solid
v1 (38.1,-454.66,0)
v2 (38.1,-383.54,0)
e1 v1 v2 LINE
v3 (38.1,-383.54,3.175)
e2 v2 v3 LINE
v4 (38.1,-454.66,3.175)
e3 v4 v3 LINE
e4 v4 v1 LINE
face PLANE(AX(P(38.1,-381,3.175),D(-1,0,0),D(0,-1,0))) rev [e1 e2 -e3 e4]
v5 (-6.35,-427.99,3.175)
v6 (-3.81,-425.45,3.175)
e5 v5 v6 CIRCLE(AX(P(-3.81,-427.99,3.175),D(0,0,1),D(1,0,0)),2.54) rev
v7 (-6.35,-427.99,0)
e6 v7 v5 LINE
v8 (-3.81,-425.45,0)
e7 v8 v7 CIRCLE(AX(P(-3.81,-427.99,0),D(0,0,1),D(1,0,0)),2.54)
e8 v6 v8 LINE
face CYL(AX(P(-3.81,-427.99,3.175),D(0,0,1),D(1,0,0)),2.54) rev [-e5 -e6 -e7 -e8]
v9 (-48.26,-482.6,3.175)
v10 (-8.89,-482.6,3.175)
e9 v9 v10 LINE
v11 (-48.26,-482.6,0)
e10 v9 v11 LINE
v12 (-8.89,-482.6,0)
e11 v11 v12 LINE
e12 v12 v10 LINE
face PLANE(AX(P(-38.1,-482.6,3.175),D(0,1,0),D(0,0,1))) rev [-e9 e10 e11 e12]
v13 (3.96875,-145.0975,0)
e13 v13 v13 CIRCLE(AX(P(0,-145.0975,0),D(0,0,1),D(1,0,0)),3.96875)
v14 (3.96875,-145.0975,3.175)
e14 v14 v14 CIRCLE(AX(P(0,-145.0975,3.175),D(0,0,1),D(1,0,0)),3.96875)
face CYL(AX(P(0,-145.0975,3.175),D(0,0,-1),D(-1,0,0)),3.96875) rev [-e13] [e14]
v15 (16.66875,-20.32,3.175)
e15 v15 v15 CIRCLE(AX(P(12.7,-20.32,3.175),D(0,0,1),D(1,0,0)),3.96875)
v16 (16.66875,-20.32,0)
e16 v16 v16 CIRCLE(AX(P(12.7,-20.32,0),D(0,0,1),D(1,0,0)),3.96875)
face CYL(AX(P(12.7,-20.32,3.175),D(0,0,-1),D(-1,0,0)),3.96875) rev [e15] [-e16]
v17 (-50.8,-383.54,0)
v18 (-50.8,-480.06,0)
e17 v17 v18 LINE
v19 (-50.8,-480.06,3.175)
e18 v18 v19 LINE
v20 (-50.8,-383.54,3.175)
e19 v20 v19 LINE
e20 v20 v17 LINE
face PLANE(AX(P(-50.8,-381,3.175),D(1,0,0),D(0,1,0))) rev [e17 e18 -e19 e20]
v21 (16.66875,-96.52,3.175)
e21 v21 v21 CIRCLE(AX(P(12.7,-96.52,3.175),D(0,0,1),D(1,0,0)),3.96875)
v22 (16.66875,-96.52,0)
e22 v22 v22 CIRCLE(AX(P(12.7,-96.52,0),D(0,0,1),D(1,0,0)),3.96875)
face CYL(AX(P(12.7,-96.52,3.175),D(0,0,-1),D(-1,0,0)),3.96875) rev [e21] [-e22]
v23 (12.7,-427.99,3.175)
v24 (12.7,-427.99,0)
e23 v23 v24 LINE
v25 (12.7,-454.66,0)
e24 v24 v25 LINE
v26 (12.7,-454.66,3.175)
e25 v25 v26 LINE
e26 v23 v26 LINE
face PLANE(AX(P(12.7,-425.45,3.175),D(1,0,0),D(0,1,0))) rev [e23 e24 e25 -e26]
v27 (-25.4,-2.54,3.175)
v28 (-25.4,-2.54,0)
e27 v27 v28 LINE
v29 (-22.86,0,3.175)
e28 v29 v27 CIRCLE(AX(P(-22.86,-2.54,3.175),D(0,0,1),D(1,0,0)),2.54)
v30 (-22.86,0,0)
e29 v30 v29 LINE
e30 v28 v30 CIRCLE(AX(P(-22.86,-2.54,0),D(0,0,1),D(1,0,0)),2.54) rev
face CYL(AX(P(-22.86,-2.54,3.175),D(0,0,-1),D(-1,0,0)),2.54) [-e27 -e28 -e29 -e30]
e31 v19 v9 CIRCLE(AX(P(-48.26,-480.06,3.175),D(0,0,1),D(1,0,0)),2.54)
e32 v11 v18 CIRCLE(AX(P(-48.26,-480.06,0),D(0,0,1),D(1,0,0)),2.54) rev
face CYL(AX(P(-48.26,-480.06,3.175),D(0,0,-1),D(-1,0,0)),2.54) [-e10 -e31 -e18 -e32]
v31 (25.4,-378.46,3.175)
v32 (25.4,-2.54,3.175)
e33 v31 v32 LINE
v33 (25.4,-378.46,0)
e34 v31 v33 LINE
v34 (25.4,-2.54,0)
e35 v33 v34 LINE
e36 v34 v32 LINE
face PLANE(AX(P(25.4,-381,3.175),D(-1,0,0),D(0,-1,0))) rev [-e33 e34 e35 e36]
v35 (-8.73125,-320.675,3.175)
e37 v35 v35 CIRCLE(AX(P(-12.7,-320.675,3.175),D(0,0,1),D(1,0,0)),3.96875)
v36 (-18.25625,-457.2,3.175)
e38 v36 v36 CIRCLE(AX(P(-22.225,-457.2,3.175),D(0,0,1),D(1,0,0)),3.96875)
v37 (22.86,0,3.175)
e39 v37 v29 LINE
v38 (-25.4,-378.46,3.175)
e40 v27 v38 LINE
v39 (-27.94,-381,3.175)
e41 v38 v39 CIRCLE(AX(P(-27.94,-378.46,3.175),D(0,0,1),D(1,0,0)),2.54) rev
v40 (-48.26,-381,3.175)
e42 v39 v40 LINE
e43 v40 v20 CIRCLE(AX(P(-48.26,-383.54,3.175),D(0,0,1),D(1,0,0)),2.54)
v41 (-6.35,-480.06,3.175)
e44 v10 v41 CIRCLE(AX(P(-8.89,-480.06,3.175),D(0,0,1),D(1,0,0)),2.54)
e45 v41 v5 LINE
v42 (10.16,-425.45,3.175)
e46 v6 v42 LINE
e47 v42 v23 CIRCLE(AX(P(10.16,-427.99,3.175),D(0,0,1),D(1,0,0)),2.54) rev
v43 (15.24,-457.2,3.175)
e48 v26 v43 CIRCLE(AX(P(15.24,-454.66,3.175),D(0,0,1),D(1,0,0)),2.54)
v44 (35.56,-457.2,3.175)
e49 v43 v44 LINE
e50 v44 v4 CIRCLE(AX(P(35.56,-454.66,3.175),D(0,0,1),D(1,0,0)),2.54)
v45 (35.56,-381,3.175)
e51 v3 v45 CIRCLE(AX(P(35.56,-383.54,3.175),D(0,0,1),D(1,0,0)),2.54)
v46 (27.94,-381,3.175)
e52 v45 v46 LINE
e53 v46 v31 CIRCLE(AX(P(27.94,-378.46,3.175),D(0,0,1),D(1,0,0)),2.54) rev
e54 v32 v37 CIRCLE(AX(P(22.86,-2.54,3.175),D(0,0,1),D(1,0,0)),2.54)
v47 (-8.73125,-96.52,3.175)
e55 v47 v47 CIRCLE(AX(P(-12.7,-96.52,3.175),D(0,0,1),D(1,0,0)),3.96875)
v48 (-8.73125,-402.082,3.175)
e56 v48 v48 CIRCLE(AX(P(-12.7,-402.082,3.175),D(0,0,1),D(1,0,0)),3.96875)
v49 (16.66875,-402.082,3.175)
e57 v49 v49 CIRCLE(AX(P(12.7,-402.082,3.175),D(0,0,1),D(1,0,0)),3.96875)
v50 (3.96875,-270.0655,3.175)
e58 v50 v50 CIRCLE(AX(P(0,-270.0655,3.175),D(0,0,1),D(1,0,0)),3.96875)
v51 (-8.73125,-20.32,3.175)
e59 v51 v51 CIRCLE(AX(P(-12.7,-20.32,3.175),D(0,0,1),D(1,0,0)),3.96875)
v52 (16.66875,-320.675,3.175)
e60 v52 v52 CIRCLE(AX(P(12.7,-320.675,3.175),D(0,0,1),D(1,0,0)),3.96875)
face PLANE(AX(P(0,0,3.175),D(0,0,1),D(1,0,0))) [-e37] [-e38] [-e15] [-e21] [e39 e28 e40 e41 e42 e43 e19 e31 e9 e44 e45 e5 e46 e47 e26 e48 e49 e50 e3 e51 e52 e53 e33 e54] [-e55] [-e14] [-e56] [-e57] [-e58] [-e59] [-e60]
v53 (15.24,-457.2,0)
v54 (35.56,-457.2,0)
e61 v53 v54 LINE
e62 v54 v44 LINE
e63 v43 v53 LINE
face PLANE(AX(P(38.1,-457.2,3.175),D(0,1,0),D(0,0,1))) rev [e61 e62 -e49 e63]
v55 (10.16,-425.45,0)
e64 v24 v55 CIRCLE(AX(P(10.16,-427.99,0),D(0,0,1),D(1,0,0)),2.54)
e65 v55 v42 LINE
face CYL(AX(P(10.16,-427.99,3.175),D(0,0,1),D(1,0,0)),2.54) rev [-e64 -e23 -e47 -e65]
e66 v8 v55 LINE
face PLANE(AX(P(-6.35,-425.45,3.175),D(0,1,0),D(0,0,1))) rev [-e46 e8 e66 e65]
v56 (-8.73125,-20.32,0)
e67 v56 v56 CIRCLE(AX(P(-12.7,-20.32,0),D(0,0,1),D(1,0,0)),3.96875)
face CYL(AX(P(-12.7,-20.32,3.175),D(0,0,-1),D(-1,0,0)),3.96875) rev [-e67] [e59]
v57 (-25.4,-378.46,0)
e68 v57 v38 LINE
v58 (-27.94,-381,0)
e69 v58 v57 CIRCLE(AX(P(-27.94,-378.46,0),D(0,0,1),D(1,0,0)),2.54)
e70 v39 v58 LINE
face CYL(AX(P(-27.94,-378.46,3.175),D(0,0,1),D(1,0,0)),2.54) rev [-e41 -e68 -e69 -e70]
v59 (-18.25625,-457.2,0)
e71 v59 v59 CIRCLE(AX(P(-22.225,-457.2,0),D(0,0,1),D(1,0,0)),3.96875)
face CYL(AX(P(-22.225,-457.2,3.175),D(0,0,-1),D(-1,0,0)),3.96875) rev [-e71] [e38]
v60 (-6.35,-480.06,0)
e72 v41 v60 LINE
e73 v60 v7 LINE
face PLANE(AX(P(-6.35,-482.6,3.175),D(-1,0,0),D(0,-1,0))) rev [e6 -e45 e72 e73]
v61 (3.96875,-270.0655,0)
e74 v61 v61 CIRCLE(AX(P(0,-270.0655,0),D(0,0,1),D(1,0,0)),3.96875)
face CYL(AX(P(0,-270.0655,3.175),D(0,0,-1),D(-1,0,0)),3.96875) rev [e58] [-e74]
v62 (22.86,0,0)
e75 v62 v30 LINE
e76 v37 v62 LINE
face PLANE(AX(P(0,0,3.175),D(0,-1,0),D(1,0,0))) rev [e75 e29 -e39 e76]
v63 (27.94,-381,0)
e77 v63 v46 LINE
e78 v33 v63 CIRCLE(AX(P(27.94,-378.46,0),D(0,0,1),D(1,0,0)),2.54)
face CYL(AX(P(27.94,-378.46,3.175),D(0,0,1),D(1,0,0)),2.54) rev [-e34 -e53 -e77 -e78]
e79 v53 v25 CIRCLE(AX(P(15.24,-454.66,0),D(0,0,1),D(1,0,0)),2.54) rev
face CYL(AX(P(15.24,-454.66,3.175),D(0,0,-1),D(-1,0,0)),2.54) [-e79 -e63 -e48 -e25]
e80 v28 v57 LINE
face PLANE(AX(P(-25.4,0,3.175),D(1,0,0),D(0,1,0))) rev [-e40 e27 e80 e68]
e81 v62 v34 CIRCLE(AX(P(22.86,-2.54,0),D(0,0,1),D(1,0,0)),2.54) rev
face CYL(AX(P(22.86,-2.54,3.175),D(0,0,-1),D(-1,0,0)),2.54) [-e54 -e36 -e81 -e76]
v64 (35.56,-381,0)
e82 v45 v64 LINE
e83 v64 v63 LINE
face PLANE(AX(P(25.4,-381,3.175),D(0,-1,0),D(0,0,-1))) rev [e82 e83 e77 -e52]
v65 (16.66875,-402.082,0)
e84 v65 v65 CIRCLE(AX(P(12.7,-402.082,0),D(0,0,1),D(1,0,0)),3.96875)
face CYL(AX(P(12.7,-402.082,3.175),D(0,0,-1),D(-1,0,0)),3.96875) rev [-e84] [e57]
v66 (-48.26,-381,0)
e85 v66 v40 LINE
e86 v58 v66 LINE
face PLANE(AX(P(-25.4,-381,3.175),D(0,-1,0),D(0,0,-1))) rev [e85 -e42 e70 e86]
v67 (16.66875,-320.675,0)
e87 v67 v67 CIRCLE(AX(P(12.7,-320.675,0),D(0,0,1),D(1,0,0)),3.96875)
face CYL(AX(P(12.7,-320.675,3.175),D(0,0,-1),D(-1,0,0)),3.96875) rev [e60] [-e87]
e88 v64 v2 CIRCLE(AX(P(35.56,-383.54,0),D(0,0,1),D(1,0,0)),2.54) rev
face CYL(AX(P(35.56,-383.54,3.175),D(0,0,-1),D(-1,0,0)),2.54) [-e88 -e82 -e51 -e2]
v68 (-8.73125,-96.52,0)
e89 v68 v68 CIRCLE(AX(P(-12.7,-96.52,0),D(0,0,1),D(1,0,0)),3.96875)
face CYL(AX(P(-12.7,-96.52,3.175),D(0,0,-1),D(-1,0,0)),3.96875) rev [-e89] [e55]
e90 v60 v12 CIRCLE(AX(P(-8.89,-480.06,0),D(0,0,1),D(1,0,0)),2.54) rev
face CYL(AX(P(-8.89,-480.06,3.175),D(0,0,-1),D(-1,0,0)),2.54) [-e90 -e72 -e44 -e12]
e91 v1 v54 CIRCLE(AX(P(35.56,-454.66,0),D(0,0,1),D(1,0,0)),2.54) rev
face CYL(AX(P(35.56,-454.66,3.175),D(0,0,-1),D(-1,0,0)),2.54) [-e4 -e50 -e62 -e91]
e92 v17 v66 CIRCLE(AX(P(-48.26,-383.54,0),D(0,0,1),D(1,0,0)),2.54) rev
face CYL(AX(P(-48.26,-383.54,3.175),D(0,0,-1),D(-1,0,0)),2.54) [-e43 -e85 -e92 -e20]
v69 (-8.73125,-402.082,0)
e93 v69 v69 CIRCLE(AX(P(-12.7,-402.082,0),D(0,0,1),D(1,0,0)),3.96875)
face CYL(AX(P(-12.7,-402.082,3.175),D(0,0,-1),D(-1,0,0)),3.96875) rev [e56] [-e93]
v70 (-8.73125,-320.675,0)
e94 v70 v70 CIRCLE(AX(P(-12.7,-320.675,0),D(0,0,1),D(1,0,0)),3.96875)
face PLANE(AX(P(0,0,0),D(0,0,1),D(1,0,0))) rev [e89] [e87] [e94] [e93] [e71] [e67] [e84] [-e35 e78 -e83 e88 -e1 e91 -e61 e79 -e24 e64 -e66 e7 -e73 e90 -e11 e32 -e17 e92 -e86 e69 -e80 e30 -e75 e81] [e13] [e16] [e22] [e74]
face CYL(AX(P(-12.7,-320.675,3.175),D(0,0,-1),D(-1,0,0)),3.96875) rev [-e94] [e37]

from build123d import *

# Parameters (mm, degrees)
BOSS_EXTRUDE1_OUTLINE_R = 3.96875
BOSS_EXTRUDE1_DEPTH     = 3.175
FILLET2_R               = 2.54


# Read off the part's stored shape, not the designer's step: Boss-Extrude1
with BuildPart() as part:
    # Boss-Extrude1 outline → Boss-Extrude1 (new body)
    with BuildSketch(Plane.XY):
        Polygon((25.4, 0), (-25.4, 0), (-25.4, -381), (-50.8, -381), (-50.8, -482.6), (-6.35, -482.6), (-6.35, -425.45), (12.7, -425.45), (12.7, -457.2), (38.1, -457.2), (38.1, -381), (25.4, -381), align=None)
        with Locations((-22.225, -457.2)):
            Circle(BOSS_EXTRUDE1_OUTLINE_R, mode=Mode.SUBTRACT)
        with Locations((-12.7, -402.082)):
            Circle(BOSS_EXTRUDE1_OUTLINE_R, mode=Mode.SUBTRACT)
        with Locations((-12.7, -320.675)):
            Circle(BOSS_EXTRUDE1_OUTLINE_R, mode=Mode.SUBTRACT)
        with Locations((12.7, -402.082)):
            Circle(BOSS_EXTRUDE1_OUTLINE_R, mode=Mode.SUBTRACT)
        with Locations((12.7, -320.675)):
            Circle(BOSS_EXTRUDE1_OUTLINE_R, mode=Mode.SUBTRACT)
        with Locations((0, -270.0655)):
            Circle(BOSS_EXTRUDE1_OUTLINE_R, mode=Mode.SUBTRACT)
        with Locations((-12.7, -96.52)):
            Circle(BOSS_EXTRUDE1_OUTLINE_R, mode=Mode.SUBTRACT)
        with Locations((-12.7, -20.32)):
            Circle(BOSS_EXTRUDE1_OUTLINE_R, mode=Mode.SUBTRACT)
        with Locations((0, -145.0975)):
            Circle(BOSS_EXTRUDE1_OUTLINE_R, mode=Mode.SUBTRACT)
        with Locations((12.7, -96.52)):
            Circle(BOSS_EXTRUDE1_OUTLINE_R, mode=Mode.SUBTRACT)
        with Locations((12.7, -20.32)):
            Circle(BOSS_EXTRUDE1_OUTLINE_R, mode=Mode.SUBTRACT)
    extrude(amount=BOSS_EXTRUDE1_DEPTH)

    # Fillet2
    fillet2_edges = [part.edges().sort_by_distance(p)[0] for p in [
        (25.4, 0, 1.5875),
        (25.4, -381, 1.5875),
        (38.1, -381, 1.5875),
        (38.1, -457.2, 1.5875),
        (12.7, -457.2, 1.5875),
        (12.7, -425.45, 1.5875),
        (-6.35, -425.45, 1.5875),
        (-6.35, -482.6, 1.5875),
        (-50.8, -482.6, 1.5875),
        (-50.8, -381, 1.5875),
        (-25.4, -381, 1.5875),
        (-25.4, 0, 1.5875),
    ]]
    fillet(fillet2_edges, radius=FILLET2_R)


solid = part.part
